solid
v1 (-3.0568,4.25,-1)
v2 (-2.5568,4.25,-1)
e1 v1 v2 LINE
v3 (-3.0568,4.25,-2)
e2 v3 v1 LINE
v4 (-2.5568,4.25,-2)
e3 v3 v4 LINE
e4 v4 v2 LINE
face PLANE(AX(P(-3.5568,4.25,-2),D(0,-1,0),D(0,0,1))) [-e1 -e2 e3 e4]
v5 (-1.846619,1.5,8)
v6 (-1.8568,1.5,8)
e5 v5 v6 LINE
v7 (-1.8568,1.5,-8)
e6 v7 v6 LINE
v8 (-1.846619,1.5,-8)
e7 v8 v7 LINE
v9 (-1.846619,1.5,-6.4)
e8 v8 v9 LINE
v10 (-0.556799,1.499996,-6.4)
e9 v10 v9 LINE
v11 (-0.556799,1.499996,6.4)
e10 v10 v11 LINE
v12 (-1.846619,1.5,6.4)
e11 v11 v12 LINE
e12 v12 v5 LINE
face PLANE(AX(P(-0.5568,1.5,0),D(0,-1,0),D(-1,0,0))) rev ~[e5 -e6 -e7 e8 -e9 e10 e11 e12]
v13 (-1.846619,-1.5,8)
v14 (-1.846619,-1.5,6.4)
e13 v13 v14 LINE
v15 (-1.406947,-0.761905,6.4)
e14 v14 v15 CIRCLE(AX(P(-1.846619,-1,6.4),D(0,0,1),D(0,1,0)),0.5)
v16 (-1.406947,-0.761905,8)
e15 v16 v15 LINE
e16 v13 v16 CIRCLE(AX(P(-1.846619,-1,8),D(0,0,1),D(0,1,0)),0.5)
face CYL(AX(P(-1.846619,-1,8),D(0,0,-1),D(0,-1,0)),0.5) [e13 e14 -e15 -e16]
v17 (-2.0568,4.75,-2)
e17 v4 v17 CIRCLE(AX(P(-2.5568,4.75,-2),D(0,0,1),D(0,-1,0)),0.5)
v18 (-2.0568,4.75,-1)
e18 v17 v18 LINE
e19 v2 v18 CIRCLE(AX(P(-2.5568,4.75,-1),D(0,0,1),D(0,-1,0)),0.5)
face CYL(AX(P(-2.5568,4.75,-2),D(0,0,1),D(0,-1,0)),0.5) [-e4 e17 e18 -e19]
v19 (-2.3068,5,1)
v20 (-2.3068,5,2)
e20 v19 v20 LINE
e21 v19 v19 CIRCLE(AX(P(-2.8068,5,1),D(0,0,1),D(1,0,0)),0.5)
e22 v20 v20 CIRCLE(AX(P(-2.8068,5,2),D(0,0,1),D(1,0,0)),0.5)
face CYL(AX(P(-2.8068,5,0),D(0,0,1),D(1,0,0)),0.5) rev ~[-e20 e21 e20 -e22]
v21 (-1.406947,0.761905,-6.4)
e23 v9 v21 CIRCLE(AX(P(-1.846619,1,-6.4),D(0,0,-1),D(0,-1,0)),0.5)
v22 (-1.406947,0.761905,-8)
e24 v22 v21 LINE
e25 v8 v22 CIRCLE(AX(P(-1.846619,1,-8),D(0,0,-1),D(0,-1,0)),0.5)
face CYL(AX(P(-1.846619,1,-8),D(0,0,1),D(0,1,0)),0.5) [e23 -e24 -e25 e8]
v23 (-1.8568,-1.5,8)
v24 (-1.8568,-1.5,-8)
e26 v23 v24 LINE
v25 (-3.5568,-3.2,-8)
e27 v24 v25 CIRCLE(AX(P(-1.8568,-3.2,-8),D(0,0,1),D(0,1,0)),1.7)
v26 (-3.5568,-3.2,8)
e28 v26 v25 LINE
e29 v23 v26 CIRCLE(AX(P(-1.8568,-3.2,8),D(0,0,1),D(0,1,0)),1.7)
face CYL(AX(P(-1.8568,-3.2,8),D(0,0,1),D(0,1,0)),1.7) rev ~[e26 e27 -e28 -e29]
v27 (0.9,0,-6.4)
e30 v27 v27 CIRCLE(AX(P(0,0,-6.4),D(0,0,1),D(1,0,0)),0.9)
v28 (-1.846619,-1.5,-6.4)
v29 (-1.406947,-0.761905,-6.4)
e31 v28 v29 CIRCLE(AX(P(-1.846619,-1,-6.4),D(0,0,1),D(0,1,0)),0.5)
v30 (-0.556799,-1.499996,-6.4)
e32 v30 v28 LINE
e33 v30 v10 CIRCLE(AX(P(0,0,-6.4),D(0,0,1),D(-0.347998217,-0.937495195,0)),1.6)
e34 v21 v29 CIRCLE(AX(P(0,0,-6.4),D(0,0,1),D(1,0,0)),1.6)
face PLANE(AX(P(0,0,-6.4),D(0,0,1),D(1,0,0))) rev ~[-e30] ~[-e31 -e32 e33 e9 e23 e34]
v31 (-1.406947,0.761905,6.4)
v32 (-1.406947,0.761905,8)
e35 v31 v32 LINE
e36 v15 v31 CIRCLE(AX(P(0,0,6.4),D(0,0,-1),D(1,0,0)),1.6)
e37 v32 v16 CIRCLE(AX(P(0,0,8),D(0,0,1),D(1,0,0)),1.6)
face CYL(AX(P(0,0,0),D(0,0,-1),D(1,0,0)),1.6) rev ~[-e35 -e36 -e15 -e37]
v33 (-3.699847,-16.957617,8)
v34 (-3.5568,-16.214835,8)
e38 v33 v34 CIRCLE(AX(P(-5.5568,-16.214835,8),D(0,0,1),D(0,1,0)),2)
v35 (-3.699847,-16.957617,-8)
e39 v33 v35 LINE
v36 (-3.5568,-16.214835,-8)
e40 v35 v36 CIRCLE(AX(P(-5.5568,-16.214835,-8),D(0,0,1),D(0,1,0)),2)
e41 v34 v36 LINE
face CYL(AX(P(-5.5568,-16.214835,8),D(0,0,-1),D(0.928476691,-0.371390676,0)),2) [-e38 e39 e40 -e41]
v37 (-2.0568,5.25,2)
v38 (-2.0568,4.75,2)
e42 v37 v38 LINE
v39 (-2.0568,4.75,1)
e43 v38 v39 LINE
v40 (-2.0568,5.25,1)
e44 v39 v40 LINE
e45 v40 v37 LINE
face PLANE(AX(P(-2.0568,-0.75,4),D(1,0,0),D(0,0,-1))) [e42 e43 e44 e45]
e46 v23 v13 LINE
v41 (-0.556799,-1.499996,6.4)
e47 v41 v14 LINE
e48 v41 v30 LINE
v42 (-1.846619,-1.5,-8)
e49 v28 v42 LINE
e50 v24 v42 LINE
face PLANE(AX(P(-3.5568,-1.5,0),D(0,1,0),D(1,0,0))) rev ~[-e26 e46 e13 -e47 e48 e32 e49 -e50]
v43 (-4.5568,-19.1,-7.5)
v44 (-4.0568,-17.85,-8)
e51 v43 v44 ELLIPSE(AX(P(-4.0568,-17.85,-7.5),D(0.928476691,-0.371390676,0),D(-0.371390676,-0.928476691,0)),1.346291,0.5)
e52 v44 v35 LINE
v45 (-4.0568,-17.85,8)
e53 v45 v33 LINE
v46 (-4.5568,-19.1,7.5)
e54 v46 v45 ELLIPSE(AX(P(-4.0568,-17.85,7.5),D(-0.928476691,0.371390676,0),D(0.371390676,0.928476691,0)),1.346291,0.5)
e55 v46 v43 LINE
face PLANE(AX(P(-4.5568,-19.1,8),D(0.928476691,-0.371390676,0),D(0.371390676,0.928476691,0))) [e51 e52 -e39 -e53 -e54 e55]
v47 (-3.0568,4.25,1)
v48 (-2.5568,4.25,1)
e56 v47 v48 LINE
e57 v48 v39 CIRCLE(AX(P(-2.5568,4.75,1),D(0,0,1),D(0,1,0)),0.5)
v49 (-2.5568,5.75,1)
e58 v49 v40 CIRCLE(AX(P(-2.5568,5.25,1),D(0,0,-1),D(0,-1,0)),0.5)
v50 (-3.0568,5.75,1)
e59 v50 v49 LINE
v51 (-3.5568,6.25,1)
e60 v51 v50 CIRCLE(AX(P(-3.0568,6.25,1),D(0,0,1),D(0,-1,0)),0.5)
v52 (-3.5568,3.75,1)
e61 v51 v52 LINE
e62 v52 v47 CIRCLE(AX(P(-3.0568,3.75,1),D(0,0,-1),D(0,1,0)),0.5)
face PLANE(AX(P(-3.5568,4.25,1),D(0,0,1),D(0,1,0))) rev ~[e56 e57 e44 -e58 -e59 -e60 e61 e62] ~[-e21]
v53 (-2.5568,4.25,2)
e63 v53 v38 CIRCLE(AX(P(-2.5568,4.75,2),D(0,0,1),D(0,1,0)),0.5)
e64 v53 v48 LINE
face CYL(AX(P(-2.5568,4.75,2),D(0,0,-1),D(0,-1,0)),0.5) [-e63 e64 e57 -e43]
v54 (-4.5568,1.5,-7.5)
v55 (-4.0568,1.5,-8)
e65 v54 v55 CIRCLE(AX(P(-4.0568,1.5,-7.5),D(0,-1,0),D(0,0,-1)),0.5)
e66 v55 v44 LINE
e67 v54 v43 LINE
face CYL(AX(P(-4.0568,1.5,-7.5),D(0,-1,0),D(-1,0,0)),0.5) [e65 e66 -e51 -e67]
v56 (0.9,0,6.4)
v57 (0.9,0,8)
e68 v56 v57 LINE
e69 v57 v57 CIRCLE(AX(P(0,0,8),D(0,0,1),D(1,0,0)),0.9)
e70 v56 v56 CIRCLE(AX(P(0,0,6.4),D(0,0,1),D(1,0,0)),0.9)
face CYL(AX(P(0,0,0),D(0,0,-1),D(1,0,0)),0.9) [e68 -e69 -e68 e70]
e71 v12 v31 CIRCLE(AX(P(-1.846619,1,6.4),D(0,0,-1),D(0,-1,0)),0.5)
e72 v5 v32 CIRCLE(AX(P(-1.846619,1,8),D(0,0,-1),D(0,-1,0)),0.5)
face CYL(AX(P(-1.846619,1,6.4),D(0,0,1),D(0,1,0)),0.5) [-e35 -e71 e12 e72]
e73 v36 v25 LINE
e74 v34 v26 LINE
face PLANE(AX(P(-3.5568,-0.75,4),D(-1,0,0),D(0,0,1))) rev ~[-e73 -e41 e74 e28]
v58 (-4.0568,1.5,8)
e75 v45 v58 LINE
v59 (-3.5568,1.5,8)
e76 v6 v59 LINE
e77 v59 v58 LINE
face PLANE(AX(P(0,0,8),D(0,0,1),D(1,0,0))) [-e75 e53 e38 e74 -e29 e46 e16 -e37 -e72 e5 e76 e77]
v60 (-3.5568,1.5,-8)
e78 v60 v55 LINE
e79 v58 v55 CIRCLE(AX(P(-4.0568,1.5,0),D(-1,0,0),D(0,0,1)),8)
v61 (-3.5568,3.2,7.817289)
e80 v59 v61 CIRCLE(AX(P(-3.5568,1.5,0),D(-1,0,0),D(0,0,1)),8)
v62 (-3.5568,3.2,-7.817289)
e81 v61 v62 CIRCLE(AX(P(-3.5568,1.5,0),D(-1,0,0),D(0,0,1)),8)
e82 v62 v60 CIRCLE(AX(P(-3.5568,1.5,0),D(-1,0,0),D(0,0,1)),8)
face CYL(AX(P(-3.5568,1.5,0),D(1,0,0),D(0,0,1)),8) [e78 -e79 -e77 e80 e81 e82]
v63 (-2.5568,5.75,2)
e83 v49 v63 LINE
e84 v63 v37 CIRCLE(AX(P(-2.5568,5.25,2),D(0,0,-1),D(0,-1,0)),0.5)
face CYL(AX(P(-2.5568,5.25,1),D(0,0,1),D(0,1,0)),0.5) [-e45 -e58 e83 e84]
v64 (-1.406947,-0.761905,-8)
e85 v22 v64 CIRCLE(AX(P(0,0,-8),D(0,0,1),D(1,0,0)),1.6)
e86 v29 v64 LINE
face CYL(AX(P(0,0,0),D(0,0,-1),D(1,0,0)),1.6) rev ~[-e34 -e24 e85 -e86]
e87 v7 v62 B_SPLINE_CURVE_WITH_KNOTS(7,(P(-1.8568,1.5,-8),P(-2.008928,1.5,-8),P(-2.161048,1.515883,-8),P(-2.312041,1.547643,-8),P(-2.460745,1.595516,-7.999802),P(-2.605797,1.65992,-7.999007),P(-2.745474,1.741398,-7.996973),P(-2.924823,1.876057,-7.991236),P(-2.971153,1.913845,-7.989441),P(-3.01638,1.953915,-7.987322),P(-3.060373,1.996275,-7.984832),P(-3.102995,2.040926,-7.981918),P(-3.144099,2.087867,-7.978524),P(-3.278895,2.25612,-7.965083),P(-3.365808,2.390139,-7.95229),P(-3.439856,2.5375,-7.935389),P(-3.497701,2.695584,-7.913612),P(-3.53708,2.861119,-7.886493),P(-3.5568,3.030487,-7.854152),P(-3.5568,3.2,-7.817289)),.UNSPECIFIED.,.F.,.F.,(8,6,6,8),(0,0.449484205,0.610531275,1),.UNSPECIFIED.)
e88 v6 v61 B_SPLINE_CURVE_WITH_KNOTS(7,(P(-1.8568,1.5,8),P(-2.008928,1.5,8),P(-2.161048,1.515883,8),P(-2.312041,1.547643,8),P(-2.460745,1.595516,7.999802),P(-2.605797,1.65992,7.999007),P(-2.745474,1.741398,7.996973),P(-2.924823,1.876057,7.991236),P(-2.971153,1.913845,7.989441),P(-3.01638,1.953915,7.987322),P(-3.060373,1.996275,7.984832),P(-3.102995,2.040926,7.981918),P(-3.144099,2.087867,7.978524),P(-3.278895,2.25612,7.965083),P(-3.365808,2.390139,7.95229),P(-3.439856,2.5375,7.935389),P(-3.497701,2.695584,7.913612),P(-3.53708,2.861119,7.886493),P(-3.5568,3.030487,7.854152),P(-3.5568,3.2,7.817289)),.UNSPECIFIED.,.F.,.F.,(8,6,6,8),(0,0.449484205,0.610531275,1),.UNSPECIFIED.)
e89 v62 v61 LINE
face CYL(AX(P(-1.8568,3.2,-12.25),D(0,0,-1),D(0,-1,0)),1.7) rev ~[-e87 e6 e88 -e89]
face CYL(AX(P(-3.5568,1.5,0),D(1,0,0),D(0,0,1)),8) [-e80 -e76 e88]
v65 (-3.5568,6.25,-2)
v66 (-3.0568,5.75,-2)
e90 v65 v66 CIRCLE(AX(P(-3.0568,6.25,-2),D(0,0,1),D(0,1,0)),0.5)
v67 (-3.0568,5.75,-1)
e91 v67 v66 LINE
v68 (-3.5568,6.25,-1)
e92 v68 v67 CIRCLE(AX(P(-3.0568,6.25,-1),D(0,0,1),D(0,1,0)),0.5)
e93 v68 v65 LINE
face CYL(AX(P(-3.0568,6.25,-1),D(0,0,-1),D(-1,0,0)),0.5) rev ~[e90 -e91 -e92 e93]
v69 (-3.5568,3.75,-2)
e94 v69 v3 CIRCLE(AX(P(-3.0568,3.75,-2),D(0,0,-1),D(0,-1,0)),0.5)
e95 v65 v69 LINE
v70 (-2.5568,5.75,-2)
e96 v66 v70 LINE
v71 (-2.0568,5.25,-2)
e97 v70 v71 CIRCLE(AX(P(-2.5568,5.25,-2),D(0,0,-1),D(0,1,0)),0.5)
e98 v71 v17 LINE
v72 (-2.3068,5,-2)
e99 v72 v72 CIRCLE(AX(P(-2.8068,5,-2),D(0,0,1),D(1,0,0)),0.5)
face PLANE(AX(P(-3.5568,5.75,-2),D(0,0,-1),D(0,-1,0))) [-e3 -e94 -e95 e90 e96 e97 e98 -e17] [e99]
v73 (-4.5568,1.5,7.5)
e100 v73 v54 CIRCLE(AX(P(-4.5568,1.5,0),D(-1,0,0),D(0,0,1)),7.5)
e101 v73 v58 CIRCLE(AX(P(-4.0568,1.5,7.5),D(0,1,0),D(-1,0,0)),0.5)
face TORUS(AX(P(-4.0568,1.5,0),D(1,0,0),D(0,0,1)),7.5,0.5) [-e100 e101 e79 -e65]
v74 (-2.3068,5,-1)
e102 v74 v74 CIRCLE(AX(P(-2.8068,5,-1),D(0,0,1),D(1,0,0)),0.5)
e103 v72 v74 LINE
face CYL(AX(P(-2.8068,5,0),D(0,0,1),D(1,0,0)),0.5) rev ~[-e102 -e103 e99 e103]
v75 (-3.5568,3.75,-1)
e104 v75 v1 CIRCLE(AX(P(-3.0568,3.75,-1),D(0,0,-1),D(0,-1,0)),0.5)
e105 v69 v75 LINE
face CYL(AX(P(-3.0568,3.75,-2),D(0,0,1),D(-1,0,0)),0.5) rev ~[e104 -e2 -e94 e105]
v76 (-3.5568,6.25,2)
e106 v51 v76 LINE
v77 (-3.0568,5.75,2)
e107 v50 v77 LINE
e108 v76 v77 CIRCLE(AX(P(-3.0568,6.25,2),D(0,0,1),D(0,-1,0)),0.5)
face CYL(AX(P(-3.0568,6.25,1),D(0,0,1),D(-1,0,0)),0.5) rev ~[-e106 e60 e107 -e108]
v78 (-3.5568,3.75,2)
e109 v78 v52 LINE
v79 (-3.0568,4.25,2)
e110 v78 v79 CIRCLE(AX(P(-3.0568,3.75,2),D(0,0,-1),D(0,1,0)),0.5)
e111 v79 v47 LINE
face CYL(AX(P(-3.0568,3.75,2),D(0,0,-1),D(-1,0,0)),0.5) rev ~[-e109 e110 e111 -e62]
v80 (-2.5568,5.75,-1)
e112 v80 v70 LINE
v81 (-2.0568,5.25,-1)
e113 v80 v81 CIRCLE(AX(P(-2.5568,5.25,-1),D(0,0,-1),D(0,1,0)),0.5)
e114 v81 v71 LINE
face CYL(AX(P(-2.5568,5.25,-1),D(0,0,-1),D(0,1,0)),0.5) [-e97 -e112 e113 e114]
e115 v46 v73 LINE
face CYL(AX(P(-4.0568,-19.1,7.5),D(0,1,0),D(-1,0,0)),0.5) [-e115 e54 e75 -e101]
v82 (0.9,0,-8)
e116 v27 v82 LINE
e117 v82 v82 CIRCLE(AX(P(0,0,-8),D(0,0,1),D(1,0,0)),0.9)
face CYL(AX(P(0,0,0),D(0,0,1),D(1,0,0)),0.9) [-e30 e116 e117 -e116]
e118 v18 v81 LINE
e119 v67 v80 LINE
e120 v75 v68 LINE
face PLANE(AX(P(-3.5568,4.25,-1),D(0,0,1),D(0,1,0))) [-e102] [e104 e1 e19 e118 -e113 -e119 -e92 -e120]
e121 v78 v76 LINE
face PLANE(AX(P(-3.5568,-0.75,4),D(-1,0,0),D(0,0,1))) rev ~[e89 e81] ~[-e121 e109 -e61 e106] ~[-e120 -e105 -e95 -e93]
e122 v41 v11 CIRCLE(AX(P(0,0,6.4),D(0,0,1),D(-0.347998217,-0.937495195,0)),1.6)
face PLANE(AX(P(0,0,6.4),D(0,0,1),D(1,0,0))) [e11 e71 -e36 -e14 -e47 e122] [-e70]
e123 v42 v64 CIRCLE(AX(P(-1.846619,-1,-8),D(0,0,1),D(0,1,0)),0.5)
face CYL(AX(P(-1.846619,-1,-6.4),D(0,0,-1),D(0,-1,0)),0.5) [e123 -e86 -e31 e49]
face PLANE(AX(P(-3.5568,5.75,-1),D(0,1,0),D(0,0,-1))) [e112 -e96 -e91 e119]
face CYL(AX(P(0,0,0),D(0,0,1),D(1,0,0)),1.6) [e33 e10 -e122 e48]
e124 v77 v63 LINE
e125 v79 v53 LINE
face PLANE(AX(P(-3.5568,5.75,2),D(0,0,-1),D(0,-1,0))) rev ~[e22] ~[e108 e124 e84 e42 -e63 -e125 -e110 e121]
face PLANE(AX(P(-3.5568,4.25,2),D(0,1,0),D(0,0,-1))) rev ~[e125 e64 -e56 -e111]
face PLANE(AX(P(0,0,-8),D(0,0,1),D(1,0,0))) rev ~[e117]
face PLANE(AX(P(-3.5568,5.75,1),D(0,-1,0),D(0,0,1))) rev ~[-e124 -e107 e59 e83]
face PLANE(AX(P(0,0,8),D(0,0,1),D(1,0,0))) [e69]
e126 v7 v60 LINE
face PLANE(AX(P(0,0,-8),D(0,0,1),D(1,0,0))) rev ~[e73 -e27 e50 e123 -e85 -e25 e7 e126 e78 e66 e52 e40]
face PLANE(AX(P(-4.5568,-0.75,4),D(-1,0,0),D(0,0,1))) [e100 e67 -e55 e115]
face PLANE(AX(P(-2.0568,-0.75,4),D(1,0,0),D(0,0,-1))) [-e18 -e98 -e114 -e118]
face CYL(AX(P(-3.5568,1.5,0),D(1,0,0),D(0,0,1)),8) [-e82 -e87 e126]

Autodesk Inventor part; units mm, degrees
ref_plane "YZ Plane" through (0, 0, 0) normal (1, 0, 0) x (0, 1, 0)
ref_plane "XZ Plane" through (0, 0, 0) normal (0, 1, 0) x (-1, 0, 0)
ref_plane "XY Plane" through (0, 0, 0) normal (0, 0, 1) x (1, 0, 0)
sketch "스케치1" plane through (0, 0, 0) normal (0, 0, 1) x (1, 0, 0)
  circle A0 centre (0, 0) radius 0.9
  circle A1 centre (0, 0) radius 1.6
  line L0 (-0.5568, 1.5) -> (-3.5568, 1.5)
  line L1 (-3.5568, 1.5) -> (-3.5568, -1.5)
  line L2 (-3.5568, -1.5) -> (-0.5568, -1.5)
  circle A2 centre (0, 0) radius 1.25
  point P0 (-0.2784, -0.75)
  point P1 (-0.2784, 0.75)
  point P2 (-3.5568, 0)
  dimension "d0" = 1.8
  dimension "d3" = 3.2
  dimension "d6" = 3
  dimension "d7" = 3
  dimension "d10" = 2.5
extrude "돌출1" add sketch "스케치1" along normal mid plane 16 contours A0
extrude "돌출2" add sketch "스케치1" along normal mid plane 12.8 contours A1 | A2
extrude "돌출3" add sketch "스케치1" along normal mid plane 16 contours A1 L2 L1 L0
extrude "돌출4" [suppressed]
sketch "스케치2" plane through (-3.5568, -0.75, 4) normal (-1, 0, 0) x (0, 0, 1)
  line L0 (4, 2.25) -> (4, 0.75)
  line L1 (-12, 2.25) -> (4, 2.25) projected
  line L2 (-12, 0.75) -> (-12, 2.25)
  arc A0 (4, 2.25) -> (-12, 2.25) centre (-4, 2.25) ccw
  line L3 (-12, 2.25) -> (-12, -19.75)
  line L4 (-12, -19.75) -> (4, -19.75)
  line L5 (4, -19.75) -> (4, 2.25)
  point P0 (-4, 0.75)
  dimension "d15" = 22
  dimension "d52" = 8
  dimension "d53" = 16
  dimension "d54" = 8
extrude "돌출5" add sketch "스케치2" along normal blind 1
sketch "스케치4" plane through (-3.5568, -0.75, 4) normal (1, 0, 0) x (0, 0, -1)
  line L0 (3.25, 5) -> (4.75, 5)
  line L1 (4.75, 5) -> (4.75, 6.5)
  line L2 (4.75, 6.5) -> (3.25, 6.5)
  line L3 (3.25, 6.5) -> (3.25, 5)
  line L4 (3.25, 5) -> (4.75, 6.5) construction
  line L5 (4.75, 5) -> (3.25, 6.5) construction
  line L6 (2, 5) -> (3, 5)
  line L7 (3, 5) -> (3, 6.5)
  line L8 (3, 6.5) -> (2, 6.5)
  line L9 (2, 6.5) -> (2, 5)
  line L10 (2, 5) -> (3, 6.5) construction
  line L11 (3, 5) -> (2, 6.5) construction
  line L12 (6, 5) -> (5, 5)
  line L13 (5, 5) -> (5, 6.5)
  line L14 (5, 6.5) -> (6, 6.5)
  line L15 (6, 6.5) -> (6, 5)
  line L16 (6, 5) -> (5, 6.5) construction
  line L17 (5, 5) -> (6, 6.5) construction
  point P0 (4, 0.75)
  point P1 (4, 5.75)
  point P2 (2.5, 5.75)
  point P3 (5.5, 5.75)
  dimension "d26" = 1.5
  dimension "d27" = 1.5
  dimension "d28" = 1
  dimension "d29" = 1
  dimension "d30" = 1.5
  dimension "d31" = 3
  dimension "d32" = 5
extrude "돌출7" add sketch "스케치4" along normal blind 1.5 contours L9 L8 L7 L6 | L12 L13 L14 L15
sketch "스케치5" plane through (0, 0, 0) normal (0, 0, 1) x (1, 0, 0)
  circle A0 centre (-2.8068, 5) radius 0.5
  circle A1 centre (-2.8068, 5) radius 0.4
  line L0 (-2.8068, 4.5) -> (0.1861, 4.4792)
  line L1 (0.1861, 4.4792) -> (0.1932, 5.5)
  line L2 (0.1932, 5.5) -> (-2.8068, 5.5)
  line L3 (-3.5568, 4.25) -> (-2.0568, 4.25) projected
  point P0 (0, 0)
  point P1 (-2.8068, 4.25)
  dimension "d35" = 5
  dimension "d36" = 1
  dimension "d37" = 0.8
  dimension "d49" = 3
extrude "돌출8" cut sketch "스케치5" along normal through all both and the other way through all contours A0 | A1
extrude "돌출9" [suppressed]
extrude "돌출10" [suppressed]
sketch "스케치6" plane through (0, 0, 8) normal (0, 0, 1) x (1, 0, 0)
  line L0 (-4.5568, -20.5) -> (-4.5568, 1.5) projected
  line L1 (-3.5568, -20.5) -> (-4.5568, -20.5) projected
  line L2 (-3.5568, -20.5) -> (-3.5568, -1.5) projected
  line L3 (-4.5568, -19.1) -> (-3.5568, -16.6)
  dimension "d55" = 1.4
  dimension "d61" = 3.9
extrude "돌출11" cut sketch "스케치6" against normal through all
fillet "모깎기9" radius 0.5 11 edges at (-4.5568, 9.5, 0) (-4.5568, -8.8, -8) (-4.5568, -8.8, 8) (-3.5568, 5.75, 1.5) (-2.0568, 5.75, 1.5) (-2.0568, 4.25, 1.5) (-3.5568, 4.25, 1.5) (-3.5568, 4.25, -1.5) (-3.5568, 5.75, -1.5) (-2.0568, 5.75, -1.5) (-2.0568, 4.25, -1.5)
fillet "모깎기10" radius 2 1 edges at (-3.5568, -16.6, 0)
fillet "모깎기11" radius 0.5 4 edges at (-0.5568, 1.5, 7.2) (-0.5568, -1.5, 7.2) (-0.5568, 1.5, -7.2) (-0.5568, -1.5, -7.2)
fillet "모깎기12" radius 1.7 2 edges at (-3.5568, -1.5, 0) (-3.5568, 1.5, 0)
equation "\"d29\" = d28"
properties part number "집게 이동"
